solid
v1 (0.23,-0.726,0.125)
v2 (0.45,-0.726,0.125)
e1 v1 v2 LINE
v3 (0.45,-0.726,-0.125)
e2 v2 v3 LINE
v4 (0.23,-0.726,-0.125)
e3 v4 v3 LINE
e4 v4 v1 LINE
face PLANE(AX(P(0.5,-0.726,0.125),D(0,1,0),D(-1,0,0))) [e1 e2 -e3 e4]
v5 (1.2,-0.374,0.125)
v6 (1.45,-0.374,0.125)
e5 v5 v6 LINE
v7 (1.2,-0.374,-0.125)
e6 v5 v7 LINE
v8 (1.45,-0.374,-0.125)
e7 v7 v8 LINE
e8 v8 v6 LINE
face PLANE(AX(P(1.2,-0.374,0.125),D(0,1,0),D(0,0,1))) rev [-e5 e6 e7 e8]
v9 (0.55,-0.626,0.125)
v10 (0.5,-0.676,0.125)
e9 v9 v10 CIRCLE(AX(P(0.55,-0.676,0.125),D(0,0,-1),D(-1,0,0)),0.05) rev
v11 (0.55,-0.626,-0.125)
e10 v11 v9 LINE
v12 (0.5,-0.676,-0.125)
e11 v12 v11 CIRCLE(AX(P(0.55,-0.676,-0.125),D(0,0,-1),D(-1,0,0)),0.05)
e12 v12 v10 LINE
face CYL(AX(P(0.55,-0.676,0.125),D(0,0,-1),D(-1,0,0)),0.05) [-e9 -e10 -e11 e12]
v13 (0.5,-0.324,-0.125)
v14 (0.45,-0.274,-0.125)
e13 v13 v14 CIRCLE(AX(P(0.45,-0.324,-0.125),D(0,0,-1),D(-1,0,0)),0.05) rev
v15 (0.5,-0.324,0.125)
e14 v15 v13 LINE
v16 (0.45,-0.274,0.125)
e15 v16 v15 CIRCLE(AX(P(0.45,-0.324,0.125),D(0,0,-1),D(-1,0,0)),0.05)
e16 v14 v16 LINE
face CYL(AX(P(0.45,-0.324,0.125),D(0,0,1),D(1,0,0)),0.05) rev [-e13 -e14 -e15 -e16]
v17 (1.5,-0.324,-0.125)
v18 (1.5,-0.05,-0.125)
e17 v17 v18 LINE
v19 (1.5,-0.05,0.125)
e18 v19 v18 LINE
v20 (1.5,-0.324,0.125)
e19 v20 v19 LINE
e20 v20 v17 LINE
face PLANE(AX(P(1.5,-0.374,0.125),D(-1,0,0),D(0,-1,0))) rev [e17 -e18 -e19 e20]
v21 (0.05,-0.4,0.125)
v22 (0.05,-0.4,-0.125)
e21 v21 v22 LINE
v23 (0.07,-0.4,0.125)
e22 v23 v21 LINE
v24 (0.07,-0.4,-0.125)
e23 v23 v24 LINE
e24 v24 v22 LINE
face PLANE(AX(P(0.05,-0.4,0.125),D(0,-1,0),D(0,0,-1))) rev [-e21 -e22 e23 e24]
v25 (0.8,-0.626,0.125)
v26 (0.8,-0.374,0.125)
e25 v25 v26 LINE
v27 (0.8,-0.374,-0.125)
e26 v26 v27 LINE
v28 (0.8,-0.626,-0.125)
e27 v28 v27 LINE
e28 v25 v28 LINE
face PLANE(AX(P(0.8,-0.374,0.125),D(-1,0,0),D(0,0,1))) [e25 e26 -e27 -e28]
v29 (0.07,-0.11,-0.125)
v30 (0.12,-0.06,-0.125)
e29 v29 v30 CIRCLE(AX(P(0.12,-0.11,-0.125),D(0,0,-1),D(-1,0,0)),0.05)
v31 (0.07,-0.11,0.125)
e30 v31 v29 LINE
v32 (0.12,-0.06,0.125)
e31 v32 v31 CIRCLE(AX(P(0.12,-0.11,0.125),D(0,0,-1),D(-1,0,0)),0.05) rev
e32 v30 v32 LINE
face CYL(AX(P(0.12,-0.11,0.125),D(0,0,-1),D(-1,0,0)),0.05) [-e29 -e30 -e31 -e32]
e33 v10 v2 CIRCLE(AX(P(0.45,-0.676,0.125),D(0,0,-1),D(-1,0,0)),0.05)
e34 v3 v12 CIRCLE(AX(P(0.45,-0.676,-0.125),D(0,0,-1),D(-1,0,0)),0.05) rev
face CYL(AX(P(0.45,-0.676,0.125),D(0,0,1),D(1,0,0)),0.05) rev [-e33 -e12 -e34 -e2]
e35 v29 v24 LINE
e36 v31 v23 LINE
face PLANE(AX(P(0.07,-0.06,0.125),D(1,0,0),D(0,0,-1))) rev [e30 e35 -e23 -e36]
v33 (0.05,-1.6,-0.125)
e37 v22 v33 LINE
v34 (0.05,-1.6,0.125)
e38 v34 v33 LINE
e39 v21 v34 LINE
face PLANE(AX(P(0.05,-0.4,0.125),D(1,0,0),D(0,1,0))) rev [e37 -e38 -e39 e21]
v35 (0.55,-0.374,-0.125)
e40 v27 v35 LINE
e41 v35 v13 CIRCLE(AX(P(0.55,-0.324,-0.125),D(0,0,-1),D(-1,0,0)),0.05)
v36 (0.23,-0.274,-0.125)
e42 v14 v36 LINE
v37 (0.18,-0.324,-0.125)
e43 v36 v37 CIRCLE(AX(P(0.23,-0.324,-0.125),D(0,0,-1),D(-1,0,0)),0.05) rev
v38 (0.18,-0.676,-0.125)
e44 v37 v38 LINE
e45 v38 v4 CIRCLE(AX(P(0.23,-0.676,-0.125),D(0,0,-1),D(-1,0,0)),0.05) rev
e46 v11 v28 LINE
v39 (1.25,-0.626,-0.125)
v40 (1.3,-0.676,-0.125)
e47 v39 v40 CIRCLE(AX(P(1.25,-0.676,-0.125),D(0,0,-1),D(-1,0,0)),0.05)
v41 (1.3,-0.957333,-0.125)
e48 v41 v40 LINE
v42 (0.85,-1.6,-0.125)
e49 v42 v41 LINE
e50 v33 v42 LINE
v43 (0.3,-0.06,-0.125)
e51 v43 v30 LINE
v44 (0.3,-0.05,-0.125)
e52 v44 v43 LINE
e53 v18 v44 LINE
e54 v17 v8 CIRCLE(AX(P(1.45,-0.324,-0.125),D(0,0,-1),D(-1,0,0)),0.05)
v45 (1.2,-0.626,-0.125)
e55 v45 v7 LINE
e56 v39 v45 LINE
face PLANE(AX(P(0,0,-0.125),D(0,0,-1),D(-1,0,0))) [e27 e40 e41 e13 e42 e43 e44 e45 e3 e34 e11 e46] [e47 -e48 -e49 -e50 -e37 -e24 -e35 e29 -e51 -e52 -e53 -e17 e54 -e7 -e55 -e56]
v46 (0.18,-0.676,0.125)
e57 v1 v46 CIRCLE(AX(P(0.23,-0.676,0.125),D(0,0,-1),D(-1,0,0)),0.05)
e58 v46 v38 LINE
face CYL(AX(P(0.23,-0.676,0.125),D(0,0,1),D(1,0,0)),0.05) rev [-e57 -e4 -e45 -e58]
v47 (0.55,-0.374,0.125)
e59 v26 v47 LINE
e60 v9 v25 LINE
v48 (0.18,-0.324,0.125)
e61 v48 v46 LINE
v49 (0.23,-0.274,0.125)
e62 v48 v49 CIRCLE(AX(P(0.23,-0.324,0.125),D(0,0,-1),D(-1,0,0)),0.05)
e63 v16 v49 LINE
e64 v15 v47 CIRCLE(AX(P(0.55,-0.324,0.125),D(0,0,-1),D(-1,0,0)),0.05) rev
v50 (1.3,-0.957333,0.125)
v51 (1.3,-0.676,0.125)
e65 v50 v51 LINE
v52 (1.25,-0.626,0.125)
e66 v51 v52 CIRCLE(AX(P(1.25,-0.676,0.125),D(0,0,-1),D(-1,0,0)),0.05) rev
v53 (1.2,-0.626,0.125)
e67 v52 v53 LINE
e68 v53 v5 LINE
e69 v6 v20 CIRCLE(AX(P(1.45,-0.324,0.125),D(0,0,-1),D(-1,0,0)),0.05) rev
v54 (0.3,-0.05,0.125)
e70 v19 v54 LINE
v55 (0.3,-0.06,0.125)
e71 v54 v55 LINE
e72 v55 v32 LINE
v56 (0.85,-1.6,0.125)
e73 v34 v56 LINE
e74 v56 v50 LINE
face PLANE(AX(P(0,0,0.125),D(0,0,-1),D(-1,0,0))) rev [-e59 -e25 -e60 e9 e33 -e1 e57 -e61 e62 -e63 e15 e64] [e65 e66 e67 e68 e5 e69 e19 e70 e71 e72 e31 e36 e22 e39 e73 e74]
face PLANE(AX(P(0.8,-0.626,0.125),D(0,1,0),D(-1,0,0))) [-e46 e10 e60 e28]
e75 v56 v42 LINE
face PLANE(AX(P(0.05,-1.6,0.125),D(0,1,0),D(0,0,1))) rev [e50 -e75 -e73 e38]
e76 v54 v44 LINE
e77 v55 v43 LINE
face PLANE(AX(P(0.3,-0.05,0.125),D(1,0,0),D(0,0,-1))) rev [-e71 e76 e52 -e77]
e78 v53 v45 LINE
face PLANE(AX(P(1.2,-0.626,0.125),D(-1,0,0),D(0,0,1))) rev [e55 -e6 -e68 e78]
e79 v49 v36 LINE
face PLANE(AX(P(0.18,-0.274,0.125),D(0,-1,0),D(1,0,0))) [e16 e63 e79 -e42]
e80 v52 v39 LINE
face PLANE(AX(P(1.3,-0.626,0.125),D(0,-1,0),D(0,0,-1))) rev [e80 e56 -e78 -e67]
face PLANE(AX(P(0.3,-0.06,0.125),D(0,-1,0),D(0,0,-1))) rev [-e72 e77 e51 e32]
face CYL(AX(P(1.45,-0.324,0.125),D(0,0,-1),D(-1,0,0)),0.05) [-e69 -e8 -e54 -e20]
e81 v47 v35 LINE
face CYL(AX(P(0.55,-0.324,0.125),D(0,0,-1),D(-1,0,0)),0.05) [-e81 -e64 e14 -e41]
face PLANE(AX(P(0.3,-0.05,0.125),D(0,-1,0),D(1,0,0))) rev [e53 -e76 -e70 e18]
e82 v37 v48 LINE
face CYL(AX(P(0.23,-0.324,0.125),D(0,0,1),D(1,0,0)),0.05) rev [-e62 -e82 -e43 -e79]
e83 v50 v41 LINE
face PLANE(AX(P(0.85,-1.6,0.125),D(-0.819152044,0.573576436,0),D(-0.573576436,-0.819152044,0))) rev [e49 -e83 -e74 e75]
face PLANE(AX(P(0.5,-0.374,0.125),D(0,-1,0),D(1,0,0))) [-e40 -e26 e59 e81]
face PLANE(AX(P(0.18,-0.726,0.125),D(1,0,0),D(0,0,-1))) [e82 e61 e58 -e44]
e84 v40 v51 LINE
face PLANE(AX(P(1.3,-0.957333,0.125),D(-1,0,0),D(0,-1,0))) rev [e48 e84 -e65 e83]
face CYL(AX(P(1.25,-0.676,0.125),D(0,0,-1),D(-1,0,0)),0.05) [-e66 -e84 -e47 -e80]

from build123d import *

# Parameters (mm, degrees)
BOSS_EXTRUDE1_DEPTH = 0.125
FILLET1_R           = 0.05


with BuildPart() as part:
    # frame_outline → Boss-Extrude1 (new, symmetric)
    with BuildSketch(Plane.XY):
        Polygon((0.3, -0.05), (1.5, -0.05), (1.5, -0.374), (1.2, -0.374), (1.2, -0.626), (1.3, -0.626), (1.3, -0.957333397), (0.85, -1.6), (0.05, -1.6), (0.05, -0.4), (0.07, -0.4), (0.07, -0.06), (0.3, -0.06), align=None)
        Polygon((0.5, -0.374), (0.8, -0.374), (0.8, -0.626), (0.5, -0.626), (0.5, -0.726), (0.18, -0.726), (0.18, -0.274), (0.5, -0.274), align=None, mode=Mode.SUBTRACT)
    extrude(amount=BOSS_EXTRUDE1_DEPTH, both=True)

    # Fillet1
    fillet1_edges = [part.edges().sort_by_distance(p)[0] for p in [
        (1.3, -0.626, 0),
        (1.5, -0.374, 0),
        (0.5, -0.374, 0),
        (0.5, -0.626, 0),
        (0.5, -0.726, 0),
        (0.18, -0.726, 0),
        (0.5, -0.274, 0),
        (0.18, -0.274, 0),
        (0.07, -0.06, 0),
    ]]
    fillet(fillet1_edges, radius=FILLET1_R - 0.0001)  # a hair under: the kernel refuses the full size


solid = part.part
